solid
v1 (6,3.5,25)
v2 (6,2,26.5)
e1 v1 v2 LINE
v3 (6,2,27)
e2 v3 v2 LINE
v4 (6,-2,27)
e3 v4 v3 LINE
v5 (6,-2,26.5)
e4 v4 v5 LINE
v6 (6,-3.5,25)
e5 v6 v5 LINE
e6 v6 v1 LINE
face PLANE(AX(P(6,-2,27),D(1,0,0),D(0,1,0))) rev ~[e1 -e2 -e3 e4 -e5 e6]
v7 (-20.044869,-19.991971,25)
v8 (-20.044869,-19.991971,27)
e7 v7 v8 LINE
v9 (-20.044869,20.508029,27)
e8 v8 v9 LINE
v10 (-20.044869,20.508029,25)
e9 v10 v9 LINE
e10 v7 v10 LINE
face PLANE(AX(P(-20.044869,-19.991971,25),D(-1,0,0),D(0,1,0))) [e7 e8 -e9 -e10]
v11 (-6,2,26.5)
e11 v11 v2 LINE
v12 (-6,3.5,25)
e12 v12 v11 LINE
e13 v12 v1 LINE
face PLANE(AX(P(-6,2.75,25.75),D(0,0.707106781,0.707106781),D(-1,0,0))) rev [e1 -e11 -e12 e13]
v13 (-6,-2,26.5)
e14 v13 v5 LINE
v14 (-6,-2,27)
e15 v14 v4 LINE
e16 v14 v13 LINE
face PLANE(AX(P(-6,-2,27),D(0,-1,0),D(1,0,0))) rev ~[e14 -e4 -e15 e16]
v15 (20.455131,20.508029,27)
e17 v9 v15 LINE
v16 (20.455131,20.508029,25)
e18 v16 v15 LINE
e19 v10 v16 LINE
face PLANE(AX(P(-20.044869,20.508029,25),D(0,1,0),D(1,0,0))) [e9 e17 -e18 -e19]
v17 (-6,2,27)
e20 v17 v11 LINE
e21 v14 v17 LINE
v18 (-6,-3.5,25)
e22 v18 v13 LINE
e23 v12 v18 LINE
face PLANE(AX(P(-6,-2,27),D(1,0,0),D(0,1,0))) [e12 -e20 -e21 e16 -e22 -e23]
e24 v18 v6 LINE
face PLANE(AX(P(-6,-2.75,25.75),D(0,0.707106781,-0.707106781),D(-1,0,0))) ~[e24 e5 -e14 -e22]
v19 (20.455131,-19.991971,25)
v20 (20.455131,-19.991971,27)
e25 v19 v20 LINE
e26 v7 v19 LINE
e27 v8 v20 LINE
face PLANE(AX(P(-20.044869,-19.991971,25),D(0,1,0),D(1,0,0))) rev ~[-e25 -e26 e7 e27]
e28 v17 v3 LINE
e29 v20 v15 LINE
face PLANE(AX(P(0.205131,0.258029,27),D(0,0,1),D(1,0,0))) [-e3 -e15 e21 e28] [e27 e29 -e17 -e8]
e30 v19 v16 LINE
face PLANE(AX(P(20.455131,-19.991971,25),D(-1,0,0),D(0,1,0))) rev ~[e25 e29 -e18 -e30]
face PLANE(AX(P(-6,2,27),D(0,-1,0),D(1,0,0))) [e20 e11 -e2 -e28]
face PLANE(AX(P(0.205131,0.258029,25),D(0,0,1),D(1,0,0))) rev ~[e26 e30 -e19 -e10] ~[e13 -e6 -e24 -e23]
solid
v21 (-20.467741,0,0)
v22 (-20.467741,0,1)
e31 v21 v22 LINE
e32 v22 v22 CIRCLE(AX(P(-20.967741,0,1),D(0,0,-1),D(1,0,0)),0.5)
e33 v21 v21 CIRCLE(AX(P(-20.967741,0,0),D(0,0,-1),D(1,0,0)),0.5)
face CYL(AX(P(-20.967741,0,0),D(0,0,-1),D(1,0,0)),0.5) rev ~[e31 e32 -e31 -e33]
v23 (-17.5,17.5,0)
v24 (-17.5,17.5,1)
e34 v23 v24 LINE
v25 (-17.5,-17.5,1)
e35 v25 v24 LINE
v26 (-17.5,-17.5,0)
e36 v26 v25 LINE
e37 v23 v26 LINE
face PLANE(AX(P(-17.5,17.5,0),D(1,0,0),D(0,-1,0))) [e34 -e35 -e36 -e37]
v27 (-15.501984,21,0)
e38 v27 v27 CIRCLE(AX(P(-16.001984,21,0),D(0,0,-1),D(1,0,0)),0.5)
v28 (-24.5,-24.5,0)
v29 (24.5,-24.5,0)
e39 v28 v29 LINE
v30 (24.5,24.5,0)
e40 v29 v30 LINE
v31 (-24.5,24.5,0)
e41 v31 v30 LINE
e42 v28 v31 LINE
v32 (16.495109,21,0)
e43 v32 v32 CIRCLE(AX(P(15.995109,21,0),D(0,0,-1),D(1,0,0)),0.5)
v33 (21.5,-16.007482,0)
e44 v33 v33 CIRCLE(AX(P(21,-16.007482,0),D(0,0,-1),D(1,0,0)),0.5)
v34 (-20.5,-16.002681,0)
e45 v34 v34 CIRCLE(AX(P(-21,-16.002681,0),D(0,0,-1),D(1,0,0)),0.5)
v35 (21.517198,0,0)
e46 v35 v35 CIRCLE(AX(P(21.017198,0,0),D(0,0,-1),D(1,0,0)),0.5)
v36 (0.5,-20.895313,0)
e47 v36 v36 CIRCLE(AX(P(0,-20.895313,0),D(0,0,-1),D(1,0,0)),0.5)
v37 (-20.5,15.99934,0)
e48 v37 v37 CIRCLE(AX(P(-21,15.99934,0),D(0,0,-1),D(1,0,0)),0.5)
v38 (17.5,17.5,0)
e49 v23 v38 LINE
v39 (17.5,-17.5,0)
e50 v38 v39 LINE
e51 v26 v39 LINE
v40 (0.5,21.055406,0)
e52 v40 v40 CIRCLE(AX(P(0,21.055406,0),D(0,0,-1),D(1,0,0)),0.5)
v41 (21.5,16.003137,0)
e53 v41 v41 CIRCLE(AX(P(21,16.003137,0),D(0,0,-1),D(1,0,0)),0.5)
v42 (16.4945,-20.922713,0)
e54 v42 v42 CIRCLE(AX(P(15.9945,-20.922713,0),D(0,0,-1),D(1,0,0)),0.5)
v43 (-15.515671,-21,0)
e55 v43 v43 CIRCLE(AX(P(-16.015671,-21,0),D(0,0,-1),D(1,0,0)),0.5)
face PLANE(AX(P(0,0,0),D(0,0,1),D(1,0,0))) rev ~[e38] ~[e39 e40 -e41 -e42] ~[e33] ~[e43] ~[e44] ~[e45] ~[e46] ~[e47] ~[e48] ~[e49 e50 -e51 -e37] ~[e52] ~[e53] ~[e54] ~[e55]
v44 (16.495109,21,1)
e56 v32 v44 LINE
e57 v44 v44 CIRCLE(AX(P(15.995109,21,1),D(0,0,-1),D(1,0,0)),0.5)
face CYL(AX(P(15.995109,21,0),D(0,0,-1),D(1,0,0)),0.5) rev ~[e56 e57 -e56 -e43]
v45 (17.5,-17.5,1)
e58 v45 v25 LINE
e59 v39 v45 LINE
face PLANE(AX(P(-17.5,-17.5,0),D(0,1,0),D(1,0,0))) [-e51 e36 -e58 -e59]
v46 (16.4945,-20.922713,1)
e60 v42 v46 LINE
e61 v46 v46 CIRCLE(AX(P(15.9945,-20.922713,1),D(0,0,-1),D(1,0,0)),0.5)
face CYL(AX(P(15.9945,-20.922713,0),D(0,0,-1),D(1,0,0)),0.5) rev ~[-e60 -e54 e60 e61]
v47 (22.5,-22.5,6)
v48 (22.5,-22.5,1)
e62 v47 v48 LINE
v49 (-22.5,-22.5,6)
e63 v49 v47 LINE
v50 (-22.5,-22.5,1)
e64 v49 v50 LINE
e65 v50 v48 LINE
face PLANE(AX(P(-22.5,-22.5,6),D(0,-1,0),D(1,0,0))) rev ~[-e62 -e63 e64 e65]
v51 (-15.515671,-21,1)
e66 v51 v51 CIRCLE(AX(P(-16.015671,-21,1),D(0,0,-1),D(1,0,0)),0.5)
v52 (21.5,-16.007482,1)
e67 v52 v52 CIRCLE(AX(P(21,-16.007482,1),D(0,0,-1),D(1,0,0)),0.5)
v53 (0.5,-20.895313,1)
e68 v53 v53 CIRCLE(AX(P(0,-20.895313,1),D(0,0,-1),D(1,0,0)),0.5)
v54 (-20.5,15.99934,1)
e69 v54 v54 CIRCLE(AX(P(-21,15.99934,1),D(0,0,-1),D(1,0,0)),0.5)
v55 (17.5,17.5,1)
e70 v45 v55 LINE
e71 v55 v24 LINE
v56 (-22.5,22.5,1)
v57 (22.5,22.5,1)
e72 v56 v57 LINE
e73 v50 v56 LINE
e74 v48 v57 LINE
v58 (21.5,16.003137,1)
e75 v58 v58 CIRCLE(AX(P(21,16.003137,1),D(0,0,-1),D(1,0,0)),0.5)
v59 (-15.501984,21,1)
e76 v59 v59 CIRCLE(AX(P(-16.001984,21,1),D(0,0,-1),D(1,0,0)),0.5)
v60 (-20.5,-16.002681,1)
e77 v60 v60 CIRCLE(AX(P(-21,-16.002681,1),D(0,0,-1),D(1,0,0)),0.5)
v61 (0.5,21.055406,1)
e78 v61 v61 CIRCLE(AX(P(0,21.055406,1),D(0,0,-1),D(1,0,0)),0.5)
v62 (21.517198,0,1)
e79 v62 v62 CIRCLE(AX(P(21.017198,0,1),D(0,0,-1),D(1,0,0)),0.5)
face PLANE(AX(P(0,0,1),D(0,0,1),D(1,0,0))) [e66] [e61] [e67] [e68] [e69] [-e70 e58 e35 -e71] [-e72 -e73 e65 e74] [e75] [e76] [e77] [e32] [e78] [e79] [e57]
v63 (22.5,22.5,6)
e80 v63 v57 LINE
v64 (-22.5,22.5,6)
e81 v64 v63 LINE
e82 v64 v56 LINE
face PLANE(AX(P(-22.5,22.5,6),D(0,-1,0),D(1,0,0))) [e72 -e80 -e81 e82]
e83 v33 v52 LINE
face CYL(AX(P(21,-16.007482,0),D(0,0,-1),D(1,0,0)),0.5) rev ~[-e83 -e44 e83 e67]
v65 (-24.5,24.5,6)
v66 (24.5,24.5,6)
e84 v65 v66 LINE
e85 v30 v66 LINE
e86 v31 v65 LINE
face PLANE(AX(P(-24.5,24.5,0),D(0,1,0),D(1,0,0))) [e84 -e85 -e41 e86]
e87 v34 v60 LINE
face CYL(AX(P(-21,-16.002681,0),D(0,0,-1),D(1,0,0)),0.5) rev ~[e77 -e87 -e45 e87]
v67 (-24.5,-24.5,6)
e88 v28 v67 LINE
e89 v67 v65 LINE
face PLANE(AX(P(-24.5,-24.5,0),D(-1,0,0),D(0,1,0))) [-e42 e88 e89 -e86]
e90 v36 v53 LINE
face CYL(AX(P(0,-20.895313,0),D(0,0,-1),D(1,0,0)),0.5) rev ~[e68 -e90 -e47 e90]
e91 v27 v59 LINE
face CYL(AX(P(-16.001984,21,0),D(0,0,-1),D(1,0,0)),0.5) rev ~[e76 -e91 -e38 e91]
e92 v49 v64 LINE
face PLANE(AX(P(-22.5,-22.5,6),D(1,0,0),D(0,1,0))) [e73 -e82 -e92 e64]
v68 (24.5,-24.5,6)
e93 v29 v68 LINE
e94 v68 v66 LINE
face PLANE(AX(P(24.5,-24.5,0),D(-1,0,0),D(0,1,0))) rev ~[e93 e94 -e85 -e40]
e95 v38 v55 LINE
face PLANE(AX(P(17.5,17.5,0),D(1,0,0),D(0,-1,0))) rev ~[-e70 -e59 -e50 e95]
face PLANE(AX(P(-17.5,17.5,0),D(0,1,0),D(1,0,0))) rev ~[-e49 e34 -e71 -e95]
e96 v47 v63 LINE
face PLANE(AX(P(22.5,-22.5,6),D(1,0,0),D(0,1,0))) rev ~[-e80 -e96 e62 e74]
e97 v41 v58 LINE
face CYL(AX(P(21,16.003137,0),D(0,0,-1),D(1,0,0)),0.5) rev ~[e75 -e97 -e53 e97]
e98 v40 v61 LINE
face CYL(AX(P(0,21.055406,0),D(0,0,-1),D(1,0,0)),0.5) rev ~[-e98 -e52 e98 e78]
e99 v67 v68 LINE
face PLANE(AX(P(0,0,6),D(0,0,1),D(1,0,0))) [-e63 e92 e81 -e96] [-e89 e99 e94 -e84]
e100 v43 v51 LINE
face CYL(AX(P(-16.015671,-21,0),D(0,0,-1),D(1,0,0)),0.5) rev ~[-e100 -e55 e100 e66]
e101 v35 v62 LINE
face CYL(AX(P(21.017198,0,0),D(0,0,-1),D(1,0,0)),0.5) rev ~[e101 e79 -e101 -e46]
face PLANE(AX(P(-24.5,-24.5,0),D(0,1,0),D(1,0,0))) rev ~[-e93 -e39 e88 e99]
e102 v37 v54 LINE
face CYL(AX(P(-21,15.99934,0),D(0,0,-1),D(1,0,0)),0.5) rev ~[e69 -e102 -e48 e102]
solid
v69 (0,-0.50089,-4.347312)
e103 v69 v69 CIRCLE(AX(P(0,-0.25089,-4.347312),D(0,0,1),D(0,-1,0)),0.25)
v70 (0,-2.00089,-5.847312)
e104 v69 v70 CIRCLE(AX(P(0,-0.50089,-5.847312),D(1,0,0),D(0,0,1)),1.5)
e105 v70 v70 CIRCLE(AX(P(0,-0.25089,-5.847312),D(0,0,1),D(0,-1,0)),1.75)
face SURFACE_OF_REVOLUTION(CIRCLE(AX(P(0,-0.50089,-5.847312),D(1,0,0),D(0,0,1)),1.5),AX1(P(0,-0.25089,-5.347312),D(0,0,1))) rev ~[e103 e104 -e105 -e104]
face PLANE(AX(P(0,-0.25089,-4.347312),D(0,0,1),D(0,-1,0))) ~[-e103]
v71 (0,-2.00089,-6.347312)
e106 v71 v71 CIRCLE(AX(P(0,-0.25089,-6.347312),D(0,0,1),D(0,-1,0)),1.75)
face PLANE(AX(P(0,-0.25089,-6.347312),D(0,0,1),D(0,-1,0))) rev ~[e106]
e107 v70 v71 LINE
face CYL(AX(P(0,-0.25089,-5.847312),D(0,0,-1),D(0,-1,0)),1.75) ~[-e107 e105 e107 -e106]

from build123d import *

# Parameters (mm, degrees)
F0_W      = 49
F0_H      = 49
F1_DEPTH  = 6
F2_W      = 45
F2_H      = 45
F3_DEPTH  = 5
F4_W      = 35
F4_H      = 35
F5_DEPTH  = 6.001
F10_W     = 40.5
F10_H     = 40.5
F11_DEPTH = 2
F12_W     = 12
F12_H     = 4
F13_DEPTH = 33.3483119268
F14_SIZE  = 1.5
F15_R     = 0.5
F16_DEPTH = 1


# Not quite as in the source:
# - a feature of the source that left no trace in its solid (it failed there, or was rolled back) is left out


with BuildPart() as f1:
    # F0 (on Top) → F1 (new body)
    with BuildSketch(Plane.XY):
        Rectangle(F0_W, F0_H)
    extrude(amount=F1_DEPTH)

    # F2 (on face) → F3 (cut)
    with BuildSketch(Plane.XY.offset(6)):
        Rectangle(F2_W, F2_H)
    extrude(amount=-F3_DEPTH, mode=Mode.SUBTRACT)

    # F4 (on face) → F5 (cut, through all)
    with BuildSketch(Plane(origin=(0, 0, 0), x_dir=(1, 0, 0), z_dir=(0, 0, -1))):
        Rectangle(F4_W, F4_H)
    extrude(amount=-F5_DEPTH, mode=Mode.SUBTRACT)

    # F15 (on face) → F16 (cut)
    with BuildSketch(Plane(origin=(0, 0, 0), x_dir=(1, 0, 0), z_dir=(0, 0, -1))):
        with Locations((0, 20.8953134716)):
            Circle(F15_R)
        with Locations((-20.9677405655, 0)):
            Circle(F15_R)
        with Locations((0, -21.0554059595)):
            Circle(F15_R)
        with Locations((21.0171975195, 0)):
            Circle(F15_R)
        with Locations((21, 16.0074820742)):
            Circle(F15_R)
        with Locations((15.9945003688, 20.9227129817)):
            Circle(F15_R)
        with Locations((-16.0156711936, 21)):
            Circle(F15_R)
        with Locations((-21, 16.0026811063)):
            Circle(F15_R)
        with Locations((-21, -15.9993395209)):
            Circle(F15_R)
        with Locations((-16.001984477, -21)):
            Circle(F15_R)
        with Locations((15.9951094538, -21)):
            Circle(F15_R)
        with Locations((21, -16.0031374544)):
            Circle(F15_R)
    extrude(amount=-F16_DEPTH, mode=Mode.SUBTRACT)


with BuildPart() as f8:
    # F7 (on Right) → F8 (revolve)
    with BuildSketch(Plane.YZ):
        with BuildLine():
            Line((-2.0008900769, -5.8473119268), (-2.0008900769, -6.3473119268))
            Line((-2.0008900769, -6.3473119268), (-0.2508900769, -6.3473119268))
            Line((-0.2508900769, -6.3473119268), (-0.2508900769, -4.3473119268))
            Line((-0.2508900769, -4.3473119268), (-0.5008900769, -4.3473119268))
            ThreePointArc((-0.5008900769, -4.3473119268), (-1.5615502487, -4.786651755), (-2.0008900769, -5.8473119268))
        make_face()
    revolve(axis=Axis((0, -0.2508900769, -5.3473119268), (0, 0, 1)))


with BuildPart() as f11:
    # F10 (on offset) → F11 (new body)
    with BuildSketch(Plane.XY.offset(25)):
        with Locations((0.2051311374, 0.2580289319)):
            Rectangle(F10_W, F10_H)
    extrude(amount=F11_DEPTH)

    # F12 (on face) → F13 (cut, through all)
    with BuildSketch(Plane.XY.offset(27)):
        Rectangle(F12_W, F12_H)
    extrude(amount=-F13_DEPTH, mode=Mode.SUBTRACT)

    # F14
    f14_edges = [f11.edges().sort_by_distance(p)[0] for p in [
        (0, -2, 25),
        (0, 2, 25),
    ]]
    chamfer(f14_edges, length=F14_SIZE)


solid = Compound([f1.part, f8.part, f11.part])
